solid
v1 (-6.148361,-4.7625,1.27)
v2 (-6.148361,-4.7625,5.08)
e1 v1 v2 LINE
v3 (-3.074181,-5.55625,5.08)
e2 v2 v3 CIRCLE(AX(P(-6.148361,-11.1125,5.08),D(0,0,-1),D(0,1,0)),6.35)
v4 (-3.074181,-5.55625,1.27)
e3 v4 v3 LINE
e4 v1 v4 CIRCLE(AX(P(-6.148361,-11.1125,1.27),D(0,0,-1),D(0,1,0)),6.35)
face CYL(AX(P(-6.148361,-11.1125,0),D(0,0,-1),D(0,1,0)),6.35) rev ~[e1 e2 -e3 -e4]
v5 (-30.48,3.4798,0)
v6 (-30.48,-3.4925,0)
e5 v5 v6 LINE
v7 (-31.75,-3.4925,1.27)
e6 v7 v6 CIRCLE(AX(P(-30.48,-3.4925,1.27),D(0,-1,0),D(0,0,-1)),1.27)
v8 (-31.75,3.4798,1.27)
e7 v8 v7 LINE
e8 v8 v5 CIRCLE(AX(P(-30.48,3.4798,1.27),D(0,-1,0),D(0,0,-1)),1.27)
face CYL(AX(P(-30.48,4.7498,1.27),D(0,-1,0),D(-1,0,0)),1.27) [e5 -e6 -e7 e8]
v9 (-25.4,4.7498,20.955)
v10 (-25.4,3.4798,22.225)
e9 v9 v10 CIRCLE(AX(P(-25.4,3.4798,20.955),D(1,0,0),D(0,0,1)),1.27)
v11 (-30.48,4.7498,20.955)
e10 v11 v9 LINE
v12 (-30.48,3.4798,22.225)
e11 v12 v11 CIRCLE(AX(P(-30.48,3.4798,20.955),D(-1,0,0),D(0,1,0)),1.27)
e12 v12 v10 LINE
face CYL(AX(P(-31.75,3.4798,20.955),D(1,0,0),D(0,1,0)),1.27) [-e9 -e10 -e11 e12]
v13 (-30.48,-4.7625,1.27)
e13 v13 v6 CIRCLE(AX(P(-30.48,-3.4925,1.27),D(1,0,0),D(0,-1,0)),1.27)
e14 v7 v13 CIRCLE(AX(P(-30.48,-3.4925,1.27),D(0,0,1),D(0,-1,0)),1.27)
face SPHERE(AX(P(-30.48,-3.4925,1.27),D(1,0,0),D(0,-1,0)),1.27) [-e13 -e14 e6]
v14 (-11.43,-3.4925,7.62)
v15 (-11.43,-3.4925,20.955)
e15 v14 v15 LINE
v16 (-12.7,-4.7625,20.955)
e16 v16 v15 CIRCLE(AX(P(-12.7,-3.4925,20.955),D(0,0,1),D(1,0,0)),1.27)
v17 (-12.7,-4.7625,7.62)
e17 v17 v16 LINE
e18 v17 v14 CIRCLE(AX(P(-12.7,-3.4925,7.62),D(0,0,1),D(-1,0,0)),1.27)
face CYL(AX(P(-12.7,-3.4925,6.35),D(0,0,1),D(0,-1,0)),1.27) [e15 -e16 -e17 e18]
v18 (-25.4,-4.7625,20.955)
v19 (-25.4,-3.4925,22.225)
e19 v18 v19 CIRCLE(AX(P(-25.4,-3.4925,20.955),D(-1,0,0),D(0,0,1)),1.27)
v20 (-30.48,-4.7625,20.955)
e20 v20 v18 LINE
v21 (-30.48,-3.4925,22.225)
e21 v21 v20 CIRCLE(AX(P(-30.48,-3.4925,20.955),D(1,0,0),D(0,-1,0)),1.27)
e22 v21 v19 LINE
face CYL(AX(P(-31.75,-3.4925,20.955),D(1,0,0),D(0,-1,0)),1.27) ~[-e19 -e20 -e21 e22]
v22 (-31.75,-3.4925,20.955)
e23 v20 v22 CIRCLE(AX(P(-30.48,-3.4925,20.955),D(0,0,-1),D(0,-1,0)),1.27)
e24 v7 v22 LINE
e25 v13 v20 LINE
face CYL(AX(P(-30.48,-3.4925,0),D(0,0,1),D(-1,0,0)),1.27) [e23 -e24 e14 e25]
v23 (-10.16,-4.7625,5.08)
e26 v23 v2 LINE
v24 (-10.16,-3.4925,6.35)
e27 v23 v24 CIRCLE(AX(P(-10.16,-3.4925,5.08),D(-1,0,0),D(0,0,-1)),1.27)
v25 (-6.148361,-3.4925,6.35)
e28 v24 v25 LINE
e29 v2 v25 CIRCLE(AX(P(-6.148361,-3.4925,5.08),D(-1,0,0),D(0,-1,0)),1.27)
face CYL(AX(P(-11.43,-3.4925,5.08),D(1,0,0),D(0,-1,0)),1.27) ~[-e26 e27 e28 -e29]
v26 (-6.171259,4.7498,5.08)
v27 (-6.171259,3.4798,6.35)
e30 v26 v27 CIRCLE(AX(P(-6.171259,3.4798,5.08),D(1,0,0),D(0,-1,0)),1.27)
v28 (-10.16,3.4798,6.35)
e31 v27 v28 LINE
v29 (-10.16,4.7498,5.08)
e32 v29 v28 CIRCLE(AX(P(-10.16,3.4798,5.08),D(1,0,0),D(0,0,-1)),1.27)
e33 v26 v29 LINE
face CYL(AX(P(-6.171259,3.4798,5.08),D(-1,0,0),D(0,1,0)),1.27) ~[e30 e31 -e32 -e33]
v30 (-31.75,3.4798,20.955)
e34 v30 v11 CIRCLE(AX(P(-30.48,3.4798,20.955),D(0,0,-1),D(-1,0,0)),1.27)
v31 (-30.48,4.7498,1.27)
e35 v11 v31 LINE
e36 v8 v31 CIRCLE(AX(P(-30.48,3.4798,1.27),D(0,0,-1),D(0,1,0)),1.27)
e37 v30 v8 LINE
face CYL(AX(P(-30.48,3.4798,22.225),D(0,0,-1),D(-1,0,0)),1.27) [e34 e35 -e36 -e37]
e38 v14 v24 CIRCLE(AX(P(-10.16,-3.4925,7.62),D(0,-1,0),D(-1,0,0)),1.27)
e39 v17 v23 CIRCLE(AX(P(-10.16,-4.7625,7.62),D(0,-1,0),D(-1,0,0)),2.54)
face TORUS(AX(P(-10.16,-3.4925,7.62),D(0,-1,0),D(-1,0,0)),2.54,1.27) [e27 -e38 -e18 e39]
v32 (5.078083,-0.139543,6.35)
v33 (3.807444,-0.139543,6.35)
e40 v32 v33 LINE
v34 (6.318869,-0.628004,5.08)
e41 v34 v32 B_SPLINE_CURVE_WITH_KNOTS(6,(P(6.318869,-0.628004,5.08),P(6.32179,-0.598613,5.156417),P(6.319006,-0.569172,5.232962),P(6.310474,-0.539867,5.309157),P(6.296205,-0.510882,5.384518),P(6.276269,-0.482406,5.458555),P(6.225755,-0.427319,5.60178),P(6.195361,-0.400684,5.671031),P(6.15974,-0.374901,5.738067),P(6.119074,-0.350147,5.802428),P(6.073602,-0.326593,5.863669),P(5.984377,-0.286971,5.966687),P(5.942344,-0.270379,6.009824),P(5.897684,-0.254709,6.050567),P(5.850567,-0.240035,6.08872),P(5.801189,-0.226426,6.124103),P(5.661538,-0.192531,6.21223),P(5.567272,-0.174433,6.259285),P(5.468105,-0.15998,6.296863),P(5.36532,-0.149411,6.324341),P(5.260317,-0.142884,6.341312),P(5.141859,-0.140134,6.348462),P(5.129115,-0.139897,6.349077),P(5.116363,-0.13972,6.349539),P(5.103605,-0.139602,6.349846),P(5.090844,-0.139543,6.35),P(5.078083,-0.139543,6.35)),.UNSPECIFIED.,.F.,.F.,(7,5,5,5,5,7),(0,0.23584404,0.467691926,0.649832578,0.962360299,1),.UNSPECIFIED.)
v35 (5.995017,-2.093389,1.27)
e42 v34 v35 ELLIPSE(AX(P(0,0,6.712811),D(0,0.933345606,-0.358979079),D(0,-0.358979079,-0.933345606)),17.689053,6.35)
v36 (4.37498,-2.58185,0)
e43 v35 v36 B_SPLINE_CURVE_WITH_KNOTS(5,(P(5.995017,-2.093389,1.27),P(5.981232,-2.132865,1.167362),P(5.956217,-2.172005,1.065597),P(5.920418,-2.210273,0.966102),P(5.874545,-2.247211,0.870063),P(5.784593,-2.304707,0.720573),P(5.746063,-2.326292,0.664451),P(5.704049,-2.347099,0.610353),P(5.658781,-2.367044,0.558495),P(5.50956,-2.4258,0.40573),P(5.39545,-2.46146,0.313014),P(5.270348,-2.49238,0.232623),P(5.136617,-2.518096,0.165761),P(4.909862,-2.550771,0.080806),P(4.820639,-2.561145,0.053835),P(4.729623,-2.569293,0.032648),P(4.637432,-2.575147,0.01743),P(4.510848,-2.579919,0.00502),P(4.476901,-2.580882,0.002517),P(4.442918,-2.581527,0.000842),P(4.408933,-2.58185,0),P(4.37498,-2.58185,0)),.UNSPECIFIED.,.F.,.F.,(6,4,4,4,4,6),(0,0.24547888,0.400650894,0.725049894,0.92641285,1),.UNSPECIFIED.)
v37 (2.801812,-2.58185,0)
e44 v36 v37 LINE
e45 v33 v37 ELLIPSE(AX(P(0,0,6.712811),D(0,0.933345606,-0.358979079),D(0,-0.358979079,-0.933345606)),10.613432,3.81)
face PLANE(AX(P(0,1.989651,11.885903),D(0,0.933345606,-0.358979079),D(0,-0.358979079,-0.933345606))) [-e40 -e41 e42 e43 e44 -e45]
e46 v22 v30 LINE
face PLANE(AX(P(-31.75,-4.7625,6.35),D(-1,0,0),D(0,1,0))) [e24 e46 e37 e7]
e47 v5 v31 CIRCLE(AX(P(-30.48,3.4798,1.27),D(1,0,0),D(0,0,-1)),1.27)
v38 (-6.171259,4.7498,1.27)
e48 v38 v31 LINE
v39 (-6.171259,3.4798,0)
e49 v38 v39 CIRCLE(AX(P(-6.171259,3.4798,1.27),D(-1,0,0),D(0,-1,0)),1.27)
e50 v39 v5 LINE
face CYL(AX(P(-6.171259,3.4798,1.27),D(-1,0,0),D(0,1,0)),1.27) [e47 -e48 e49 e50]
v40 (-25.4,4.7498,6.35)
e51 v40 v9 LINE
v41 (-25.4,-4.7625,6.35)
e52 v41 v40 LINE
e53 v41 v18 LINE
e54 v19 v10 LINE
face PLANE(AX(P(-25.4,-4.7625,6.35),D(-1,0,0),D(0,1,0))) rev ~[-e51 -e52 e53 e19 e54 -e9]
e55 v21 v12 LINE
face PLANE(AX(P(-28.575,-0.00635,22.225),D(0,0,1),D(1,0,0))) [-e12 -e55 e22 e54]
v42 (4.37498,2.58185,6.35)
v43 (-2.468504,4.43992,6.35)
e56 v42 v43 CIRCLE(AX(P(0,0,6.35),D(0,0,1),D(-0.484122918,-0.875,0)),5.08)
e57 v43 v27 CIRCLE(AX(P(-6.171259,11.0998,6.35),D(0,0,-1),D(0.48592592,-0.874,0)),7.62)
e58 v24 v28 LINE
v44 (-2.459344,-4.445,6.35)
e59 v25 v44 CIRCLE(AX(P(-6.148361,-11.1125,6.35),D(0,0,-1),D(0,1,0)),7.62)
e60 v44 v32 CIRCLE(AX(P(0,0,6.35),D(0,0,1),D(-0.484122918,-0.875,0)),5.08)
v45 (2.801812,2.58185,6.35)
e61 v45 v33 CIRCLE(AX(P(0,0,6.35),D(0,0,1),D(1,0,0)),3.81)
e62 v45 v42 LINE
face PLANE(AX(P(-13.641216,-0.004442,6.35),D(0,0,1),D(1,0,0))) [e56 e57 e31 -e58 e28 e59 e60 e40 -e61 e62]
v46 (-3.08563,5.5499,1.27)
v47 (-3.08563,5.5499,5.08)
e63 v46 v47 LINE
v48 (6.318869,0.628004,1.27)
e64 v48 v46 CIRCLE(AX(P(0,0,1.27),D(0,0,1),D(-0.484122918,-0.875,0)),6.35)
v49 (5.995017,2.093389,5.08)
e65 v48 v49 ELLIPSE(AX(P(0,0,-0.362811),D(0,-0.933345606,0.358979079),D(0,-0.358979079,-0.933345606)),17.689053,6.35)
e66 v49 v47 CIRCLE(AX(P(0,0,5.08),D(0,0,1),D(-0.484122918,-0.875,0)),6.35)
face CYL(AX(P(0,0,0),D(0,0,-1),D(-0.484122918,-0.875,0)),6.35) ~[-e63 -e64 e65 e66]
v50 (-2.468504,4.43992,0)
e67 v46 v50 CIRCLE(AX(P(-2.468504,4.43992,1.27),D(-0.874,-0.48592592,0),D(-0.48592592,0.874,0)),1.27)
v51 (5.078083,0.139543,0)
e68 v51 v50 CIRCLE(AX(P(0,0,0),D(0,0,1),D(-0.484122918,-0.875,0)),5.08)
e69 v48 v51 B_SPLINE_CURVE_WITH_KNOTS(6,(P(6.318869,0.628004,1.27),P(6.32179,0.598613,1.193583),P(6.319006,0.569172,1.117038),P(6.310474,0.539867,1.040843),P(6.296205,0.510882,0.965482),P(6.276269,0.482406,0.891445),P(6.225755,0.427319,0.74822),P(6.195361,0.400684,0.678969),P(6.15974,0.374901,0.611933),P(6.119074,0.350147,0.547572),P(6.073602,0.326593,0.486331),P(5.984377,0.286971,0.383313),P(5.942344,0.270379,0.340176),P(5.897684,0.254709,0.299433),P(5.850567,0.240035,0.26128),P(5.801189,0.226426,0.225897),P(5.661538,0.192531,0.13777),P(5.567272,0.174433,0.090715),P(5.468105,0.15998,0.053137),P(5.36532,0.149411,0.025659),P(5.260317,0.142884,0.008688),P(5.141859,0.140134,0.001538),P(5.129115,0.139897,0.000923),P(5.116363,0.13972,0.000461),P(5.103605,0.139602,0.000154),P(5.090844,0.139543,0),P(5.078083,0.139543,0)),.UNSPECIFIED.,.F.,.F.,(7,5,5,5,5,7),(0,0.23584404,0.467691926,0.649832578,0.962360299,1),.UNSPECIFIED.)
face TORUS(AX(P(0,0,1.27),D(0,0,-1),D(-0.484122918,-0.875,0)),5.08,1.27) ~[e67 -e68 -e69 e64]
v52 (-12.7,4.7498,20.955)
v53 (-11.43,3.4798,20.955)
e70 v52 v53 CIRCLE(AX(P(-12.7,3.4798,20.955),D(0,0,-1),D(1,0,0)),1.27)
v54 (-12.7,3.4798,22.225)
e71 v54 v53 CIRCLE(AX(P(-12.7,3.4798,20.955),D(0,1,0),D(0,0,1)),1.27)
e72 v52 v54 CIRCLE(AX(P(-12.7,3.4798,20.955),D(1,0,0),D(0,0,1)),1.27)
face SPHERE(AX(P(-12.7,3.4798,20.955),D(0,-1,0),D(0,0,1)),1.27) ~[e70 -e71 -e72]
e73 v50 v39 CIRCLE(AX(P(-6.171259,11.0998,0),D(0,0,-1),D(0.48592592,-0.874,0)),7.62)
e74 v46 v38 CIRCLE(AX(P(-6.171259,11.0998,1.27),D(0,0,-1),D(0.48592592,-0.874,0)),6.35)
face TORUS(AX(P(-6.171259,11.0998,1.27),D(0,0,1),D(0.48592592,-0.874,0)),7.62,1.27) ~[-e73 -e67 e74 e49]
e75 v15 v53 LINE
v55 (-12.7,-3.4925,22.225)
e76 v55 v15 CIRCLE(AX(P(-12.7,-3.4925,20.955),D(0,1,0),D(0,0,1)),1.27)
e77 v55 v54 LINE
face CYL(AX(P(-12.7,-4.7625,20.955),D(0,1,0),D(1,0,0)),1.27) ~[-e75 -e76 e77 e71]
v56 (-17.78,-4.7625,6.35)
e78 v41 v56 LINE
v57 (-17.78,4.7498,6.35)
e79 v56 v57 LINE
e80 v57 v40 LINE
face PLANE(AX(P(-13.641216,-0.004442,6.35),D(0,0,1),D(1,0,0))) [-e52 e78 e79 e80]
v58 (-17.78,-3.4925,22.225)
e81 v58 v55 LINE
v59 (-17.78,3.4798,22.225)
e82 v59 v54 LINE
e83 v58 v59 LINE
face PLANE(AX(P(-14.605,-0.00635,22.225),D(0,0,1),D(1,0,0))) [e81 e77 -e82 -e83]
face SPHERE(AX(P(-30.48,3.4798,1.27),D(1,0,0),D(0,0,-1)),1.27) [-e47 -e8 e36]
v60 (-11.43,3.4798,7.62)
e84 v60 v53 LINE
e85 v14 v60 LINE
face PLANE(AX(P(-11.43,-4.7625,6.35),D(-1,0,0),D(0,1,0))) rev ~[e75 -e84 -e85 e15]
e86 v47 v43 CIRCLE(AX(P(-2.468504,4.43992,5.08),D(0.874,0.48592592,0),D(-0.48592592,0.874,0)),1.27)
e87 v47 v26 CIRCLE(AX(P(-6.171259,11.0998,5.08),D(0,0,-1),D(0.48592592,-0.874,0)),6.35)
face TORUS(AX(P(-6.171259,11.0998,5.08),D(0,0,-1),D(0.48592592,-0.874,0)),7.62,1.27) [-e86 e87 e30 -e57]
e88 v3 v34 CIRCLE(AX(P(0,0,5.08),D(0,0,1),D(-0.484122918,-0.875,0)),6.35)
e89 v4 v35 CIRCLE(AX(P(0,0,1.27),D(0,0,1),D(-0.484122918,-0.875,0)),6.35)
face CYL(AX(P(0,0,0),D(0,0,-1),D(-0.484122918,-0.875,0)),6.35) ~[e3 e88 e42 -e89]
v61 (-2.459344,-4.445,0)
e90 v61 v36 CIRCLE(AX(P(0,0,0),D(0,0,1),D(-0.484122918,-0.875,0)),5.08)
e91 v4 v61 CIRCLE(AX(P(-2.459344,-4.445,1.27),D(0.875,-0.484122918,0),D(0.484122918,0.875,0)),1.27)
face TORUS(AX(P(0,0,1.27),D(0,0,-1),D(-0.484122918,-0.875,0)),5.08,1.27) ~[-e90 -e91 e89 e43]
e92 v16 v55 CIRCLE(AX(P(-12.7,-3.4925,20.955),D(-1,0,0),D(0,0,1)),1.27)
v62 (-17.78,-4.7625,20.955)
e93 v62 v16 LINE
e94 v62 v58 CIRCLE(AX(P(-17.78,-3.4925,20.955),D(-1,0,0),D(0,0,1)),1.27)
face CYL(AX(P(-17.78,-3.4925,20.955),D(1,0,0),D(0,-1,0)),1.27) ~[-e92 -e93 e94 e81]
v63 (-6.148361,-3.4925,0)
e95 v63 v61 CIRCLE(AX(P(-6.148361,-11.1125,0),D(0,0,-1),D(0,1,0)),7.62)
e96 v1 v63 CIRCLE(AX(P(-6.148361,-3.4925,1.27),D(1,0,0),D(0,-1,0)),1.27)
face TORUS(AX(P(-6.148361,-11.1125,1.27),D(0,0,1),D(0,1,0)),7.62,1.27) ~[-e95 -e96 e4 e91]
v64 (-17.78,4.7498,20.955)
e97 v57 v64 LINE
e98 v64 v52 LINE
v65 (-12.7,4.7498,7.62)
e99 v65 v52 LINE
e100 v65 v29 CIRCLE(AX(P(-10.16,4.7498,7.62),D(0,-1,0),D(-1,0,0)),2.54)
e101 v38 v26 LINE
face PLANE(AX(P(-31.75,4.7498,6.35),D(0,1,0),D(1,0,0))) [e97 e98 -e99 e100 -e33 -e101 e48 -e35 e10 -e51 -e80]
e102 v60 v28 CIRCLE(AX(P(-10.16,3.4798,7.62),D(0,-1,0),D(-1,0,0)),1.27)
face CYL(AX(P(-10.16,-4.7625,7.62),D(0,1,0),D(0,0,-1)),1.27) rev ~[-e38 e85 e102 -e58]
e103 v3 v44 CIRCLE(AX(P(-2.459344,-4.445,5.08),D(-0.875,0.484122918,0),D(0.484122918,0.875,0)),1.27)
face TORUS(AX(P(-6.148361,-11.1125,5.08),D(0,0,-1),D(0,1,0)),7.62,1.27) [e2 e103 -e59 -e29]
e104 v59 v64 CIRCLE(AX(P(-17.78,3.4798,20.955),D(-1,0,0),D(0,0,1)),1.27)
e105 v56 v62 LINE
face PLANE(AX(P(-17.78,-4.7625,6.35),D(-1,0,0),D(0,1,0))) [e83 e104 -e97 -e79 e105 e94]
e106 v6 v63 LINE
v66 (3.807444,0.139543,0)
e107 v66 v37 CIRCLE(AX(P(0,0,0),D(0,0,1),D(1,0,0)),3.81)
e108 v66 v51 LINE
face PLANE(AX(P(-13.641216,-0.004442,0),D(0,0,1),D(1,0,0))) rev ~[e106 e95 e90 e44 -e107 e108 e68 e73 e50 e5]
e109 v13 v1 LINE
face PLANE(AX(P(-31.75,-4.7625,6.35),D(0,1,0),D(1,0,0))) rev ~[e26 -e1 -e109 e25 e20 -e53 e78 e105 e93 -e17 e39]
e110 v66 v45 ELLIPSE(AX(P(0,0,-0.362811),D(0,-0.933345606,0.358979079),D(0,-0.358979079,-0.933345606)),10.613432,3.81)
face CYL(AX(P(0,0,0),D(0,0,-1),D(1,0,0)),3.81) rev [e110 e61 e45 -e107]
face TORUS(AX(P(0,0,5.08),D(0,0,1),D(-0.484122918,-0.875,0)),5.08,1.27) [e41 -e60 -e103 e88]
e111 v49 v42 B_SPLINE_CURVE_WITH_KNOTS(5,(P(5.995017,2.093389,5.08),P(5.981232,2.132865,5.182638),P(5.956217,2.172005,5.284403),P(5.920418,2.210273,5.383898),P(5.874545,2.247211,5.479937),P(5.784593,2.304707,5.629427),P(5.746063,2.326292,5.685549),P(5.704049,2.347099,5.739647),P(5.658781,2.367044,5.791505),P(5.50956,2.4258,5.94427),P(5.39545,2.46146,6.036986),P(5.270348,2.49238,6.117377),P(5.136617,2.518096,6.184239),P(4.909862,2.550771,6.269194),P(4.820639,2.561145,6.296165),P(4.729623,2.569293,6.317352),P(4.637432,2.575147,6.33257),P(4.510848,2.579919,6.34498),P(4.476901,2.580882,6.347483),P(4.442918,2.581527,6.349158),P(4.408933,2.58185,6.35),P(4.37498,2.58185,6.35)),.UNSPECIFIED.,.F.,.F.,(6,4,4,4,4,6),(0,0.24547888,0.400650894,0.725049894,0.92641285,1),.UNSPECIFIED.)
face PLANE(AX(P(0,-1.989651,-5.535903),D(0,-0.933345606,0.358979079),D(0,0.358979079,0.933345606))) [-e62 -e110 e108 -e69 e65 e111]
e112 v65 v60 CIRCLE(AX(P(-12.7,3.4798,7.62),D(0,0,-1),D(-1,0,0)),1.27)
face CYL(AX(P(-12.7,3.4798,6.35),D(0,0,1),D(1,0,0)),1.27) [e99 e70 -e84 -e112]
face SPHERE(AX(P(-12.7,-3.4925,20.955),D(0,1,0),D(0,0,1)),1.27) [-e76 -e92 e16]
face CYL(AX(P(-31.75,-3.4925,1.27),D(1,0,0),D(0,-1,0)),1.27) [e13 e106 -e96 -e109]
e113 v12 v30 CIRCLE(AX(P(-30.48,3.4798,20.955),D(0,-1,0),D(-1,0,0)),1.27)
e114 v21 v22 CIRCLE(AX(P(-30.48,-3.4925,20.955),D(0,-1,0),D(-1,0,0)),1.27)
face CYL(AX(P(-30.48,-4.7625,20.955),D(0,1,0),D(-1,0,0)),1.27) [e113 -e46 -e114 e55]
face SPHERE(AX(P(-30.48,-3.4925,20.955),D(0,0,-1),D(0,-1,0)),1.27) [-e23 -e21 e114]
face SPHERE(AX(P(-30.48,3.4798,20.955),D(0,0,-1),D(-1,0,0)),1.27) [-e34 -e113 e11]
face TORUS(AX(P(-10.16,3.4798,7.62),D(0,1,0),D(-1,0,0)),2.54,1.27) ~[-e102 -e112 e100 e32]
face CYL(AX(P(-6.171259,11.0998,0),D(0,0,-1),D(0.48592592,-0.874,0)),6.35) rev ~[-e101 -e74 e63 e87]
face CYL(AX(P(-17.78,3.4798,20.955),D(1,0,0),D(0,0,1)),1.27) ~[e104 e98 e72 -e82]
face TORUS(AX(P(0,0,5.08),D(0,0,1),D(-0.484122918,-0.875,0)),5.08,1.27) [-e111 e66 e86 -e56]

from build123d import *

# Parameters (mm, degrees)
F0_R     = 3.81
F1_DEPTH = 6.35
F2_W     = 6.35
F2_H     = 9.5123
F3_DEPTH = 15.875
F4_R     = 1.27
F6_DEPTH = 6.351


with BuildPart() as f1:
    # F0 (on Top) → F1 (new body)
    with BuildSketch(Plane.XY):
        with BuildLine():
            ThreePointArc((-6.1483610621, -4.7625), (-4.5608610621, -4.9641389379), (-3.0741805311, -5.55625))
            ThreePointArc((-3.0741805311, -5.55625), (6.3499966259, 0.0065460587), (-3.0856295938, 5.5499))
            ThreePointArc((-3.0856295938, 5.5499), (-4.577421837, 4.9530787195), (-6.1712591876, 4.7498))
            Line((-6.1712591876, 4.7498), (-31.75, 4.7498))
            Line((-31.75, 4.7498), (-31.75, -4.7625))
            Line((-31.75, -4.7625), (-6.1483610621, -4.7625))
        make_face()
        Circle(F0_R, mode=Mode.SUBTRACT)
    extrude(amount=F1_DEPTH)

    # F2 (on face) → F3 (join)
    with BuildSketch(Plane.XY.offset(6.35)):
        with Locations((-28.575, -0.00635)):
            Rectangle(F2_W, F2_H)
        with Locations((-14.605, -0.00635)):
            Rectangle(F2_W, F2_H)
    extrude(amount=F3_DEPTH)

    # F4
    f4_edges = [f1.edges().sort_by_distance(p)[0] for p in [
        (-18.949181, -4.7625, 0),
        (-8.789181, -4.7625, 6.35),
        (-11.43, -0.00635, 6.35),
        (-11.43, -0.00635, 22.225),
        (-31.75, -4.7625, 11.1125),
        (-31.75, -0.00635, 0),
        (-31.75, 4.7498, 11.1125),
        (-28.575, -4.7625, 22.225),
        (-31.75, -0.00635, 22.225),
        (-28.575, 4.7498, 22.225),
        (-14.605, -4.7625, 22.225),
        (-14.605, 4.7498, 22.225),
        (-4.560861, -4.964139, 0),
        (-4.560861, -4.964139, 6.35),
        (-4.577422, 4.953079, 6.35),
        (-4.577422, 4.953079, 0),
        (-11.43, 4.7498, 14.2875),
        (-18.96063, 4.7498, 0),
        (-11.43, -4.7625, 14.2875),
    ]]
    fillet(f4_edges, radius=F4_R)

    # F5 (on Right) → F6 (cut, through all)
    with BuildSketch(Plane.YZ):
        Polygon((-4.3603489199, -4.6240965693), (-1.9896510801, -5.5359034307), (4.3603489199, 10.9740965693), (1.9896510801, 11.8859034307), align=None)
    extrude(amount=F6_DEPTH, mode=Mode.SUBTRACT)


solid = f1.part
